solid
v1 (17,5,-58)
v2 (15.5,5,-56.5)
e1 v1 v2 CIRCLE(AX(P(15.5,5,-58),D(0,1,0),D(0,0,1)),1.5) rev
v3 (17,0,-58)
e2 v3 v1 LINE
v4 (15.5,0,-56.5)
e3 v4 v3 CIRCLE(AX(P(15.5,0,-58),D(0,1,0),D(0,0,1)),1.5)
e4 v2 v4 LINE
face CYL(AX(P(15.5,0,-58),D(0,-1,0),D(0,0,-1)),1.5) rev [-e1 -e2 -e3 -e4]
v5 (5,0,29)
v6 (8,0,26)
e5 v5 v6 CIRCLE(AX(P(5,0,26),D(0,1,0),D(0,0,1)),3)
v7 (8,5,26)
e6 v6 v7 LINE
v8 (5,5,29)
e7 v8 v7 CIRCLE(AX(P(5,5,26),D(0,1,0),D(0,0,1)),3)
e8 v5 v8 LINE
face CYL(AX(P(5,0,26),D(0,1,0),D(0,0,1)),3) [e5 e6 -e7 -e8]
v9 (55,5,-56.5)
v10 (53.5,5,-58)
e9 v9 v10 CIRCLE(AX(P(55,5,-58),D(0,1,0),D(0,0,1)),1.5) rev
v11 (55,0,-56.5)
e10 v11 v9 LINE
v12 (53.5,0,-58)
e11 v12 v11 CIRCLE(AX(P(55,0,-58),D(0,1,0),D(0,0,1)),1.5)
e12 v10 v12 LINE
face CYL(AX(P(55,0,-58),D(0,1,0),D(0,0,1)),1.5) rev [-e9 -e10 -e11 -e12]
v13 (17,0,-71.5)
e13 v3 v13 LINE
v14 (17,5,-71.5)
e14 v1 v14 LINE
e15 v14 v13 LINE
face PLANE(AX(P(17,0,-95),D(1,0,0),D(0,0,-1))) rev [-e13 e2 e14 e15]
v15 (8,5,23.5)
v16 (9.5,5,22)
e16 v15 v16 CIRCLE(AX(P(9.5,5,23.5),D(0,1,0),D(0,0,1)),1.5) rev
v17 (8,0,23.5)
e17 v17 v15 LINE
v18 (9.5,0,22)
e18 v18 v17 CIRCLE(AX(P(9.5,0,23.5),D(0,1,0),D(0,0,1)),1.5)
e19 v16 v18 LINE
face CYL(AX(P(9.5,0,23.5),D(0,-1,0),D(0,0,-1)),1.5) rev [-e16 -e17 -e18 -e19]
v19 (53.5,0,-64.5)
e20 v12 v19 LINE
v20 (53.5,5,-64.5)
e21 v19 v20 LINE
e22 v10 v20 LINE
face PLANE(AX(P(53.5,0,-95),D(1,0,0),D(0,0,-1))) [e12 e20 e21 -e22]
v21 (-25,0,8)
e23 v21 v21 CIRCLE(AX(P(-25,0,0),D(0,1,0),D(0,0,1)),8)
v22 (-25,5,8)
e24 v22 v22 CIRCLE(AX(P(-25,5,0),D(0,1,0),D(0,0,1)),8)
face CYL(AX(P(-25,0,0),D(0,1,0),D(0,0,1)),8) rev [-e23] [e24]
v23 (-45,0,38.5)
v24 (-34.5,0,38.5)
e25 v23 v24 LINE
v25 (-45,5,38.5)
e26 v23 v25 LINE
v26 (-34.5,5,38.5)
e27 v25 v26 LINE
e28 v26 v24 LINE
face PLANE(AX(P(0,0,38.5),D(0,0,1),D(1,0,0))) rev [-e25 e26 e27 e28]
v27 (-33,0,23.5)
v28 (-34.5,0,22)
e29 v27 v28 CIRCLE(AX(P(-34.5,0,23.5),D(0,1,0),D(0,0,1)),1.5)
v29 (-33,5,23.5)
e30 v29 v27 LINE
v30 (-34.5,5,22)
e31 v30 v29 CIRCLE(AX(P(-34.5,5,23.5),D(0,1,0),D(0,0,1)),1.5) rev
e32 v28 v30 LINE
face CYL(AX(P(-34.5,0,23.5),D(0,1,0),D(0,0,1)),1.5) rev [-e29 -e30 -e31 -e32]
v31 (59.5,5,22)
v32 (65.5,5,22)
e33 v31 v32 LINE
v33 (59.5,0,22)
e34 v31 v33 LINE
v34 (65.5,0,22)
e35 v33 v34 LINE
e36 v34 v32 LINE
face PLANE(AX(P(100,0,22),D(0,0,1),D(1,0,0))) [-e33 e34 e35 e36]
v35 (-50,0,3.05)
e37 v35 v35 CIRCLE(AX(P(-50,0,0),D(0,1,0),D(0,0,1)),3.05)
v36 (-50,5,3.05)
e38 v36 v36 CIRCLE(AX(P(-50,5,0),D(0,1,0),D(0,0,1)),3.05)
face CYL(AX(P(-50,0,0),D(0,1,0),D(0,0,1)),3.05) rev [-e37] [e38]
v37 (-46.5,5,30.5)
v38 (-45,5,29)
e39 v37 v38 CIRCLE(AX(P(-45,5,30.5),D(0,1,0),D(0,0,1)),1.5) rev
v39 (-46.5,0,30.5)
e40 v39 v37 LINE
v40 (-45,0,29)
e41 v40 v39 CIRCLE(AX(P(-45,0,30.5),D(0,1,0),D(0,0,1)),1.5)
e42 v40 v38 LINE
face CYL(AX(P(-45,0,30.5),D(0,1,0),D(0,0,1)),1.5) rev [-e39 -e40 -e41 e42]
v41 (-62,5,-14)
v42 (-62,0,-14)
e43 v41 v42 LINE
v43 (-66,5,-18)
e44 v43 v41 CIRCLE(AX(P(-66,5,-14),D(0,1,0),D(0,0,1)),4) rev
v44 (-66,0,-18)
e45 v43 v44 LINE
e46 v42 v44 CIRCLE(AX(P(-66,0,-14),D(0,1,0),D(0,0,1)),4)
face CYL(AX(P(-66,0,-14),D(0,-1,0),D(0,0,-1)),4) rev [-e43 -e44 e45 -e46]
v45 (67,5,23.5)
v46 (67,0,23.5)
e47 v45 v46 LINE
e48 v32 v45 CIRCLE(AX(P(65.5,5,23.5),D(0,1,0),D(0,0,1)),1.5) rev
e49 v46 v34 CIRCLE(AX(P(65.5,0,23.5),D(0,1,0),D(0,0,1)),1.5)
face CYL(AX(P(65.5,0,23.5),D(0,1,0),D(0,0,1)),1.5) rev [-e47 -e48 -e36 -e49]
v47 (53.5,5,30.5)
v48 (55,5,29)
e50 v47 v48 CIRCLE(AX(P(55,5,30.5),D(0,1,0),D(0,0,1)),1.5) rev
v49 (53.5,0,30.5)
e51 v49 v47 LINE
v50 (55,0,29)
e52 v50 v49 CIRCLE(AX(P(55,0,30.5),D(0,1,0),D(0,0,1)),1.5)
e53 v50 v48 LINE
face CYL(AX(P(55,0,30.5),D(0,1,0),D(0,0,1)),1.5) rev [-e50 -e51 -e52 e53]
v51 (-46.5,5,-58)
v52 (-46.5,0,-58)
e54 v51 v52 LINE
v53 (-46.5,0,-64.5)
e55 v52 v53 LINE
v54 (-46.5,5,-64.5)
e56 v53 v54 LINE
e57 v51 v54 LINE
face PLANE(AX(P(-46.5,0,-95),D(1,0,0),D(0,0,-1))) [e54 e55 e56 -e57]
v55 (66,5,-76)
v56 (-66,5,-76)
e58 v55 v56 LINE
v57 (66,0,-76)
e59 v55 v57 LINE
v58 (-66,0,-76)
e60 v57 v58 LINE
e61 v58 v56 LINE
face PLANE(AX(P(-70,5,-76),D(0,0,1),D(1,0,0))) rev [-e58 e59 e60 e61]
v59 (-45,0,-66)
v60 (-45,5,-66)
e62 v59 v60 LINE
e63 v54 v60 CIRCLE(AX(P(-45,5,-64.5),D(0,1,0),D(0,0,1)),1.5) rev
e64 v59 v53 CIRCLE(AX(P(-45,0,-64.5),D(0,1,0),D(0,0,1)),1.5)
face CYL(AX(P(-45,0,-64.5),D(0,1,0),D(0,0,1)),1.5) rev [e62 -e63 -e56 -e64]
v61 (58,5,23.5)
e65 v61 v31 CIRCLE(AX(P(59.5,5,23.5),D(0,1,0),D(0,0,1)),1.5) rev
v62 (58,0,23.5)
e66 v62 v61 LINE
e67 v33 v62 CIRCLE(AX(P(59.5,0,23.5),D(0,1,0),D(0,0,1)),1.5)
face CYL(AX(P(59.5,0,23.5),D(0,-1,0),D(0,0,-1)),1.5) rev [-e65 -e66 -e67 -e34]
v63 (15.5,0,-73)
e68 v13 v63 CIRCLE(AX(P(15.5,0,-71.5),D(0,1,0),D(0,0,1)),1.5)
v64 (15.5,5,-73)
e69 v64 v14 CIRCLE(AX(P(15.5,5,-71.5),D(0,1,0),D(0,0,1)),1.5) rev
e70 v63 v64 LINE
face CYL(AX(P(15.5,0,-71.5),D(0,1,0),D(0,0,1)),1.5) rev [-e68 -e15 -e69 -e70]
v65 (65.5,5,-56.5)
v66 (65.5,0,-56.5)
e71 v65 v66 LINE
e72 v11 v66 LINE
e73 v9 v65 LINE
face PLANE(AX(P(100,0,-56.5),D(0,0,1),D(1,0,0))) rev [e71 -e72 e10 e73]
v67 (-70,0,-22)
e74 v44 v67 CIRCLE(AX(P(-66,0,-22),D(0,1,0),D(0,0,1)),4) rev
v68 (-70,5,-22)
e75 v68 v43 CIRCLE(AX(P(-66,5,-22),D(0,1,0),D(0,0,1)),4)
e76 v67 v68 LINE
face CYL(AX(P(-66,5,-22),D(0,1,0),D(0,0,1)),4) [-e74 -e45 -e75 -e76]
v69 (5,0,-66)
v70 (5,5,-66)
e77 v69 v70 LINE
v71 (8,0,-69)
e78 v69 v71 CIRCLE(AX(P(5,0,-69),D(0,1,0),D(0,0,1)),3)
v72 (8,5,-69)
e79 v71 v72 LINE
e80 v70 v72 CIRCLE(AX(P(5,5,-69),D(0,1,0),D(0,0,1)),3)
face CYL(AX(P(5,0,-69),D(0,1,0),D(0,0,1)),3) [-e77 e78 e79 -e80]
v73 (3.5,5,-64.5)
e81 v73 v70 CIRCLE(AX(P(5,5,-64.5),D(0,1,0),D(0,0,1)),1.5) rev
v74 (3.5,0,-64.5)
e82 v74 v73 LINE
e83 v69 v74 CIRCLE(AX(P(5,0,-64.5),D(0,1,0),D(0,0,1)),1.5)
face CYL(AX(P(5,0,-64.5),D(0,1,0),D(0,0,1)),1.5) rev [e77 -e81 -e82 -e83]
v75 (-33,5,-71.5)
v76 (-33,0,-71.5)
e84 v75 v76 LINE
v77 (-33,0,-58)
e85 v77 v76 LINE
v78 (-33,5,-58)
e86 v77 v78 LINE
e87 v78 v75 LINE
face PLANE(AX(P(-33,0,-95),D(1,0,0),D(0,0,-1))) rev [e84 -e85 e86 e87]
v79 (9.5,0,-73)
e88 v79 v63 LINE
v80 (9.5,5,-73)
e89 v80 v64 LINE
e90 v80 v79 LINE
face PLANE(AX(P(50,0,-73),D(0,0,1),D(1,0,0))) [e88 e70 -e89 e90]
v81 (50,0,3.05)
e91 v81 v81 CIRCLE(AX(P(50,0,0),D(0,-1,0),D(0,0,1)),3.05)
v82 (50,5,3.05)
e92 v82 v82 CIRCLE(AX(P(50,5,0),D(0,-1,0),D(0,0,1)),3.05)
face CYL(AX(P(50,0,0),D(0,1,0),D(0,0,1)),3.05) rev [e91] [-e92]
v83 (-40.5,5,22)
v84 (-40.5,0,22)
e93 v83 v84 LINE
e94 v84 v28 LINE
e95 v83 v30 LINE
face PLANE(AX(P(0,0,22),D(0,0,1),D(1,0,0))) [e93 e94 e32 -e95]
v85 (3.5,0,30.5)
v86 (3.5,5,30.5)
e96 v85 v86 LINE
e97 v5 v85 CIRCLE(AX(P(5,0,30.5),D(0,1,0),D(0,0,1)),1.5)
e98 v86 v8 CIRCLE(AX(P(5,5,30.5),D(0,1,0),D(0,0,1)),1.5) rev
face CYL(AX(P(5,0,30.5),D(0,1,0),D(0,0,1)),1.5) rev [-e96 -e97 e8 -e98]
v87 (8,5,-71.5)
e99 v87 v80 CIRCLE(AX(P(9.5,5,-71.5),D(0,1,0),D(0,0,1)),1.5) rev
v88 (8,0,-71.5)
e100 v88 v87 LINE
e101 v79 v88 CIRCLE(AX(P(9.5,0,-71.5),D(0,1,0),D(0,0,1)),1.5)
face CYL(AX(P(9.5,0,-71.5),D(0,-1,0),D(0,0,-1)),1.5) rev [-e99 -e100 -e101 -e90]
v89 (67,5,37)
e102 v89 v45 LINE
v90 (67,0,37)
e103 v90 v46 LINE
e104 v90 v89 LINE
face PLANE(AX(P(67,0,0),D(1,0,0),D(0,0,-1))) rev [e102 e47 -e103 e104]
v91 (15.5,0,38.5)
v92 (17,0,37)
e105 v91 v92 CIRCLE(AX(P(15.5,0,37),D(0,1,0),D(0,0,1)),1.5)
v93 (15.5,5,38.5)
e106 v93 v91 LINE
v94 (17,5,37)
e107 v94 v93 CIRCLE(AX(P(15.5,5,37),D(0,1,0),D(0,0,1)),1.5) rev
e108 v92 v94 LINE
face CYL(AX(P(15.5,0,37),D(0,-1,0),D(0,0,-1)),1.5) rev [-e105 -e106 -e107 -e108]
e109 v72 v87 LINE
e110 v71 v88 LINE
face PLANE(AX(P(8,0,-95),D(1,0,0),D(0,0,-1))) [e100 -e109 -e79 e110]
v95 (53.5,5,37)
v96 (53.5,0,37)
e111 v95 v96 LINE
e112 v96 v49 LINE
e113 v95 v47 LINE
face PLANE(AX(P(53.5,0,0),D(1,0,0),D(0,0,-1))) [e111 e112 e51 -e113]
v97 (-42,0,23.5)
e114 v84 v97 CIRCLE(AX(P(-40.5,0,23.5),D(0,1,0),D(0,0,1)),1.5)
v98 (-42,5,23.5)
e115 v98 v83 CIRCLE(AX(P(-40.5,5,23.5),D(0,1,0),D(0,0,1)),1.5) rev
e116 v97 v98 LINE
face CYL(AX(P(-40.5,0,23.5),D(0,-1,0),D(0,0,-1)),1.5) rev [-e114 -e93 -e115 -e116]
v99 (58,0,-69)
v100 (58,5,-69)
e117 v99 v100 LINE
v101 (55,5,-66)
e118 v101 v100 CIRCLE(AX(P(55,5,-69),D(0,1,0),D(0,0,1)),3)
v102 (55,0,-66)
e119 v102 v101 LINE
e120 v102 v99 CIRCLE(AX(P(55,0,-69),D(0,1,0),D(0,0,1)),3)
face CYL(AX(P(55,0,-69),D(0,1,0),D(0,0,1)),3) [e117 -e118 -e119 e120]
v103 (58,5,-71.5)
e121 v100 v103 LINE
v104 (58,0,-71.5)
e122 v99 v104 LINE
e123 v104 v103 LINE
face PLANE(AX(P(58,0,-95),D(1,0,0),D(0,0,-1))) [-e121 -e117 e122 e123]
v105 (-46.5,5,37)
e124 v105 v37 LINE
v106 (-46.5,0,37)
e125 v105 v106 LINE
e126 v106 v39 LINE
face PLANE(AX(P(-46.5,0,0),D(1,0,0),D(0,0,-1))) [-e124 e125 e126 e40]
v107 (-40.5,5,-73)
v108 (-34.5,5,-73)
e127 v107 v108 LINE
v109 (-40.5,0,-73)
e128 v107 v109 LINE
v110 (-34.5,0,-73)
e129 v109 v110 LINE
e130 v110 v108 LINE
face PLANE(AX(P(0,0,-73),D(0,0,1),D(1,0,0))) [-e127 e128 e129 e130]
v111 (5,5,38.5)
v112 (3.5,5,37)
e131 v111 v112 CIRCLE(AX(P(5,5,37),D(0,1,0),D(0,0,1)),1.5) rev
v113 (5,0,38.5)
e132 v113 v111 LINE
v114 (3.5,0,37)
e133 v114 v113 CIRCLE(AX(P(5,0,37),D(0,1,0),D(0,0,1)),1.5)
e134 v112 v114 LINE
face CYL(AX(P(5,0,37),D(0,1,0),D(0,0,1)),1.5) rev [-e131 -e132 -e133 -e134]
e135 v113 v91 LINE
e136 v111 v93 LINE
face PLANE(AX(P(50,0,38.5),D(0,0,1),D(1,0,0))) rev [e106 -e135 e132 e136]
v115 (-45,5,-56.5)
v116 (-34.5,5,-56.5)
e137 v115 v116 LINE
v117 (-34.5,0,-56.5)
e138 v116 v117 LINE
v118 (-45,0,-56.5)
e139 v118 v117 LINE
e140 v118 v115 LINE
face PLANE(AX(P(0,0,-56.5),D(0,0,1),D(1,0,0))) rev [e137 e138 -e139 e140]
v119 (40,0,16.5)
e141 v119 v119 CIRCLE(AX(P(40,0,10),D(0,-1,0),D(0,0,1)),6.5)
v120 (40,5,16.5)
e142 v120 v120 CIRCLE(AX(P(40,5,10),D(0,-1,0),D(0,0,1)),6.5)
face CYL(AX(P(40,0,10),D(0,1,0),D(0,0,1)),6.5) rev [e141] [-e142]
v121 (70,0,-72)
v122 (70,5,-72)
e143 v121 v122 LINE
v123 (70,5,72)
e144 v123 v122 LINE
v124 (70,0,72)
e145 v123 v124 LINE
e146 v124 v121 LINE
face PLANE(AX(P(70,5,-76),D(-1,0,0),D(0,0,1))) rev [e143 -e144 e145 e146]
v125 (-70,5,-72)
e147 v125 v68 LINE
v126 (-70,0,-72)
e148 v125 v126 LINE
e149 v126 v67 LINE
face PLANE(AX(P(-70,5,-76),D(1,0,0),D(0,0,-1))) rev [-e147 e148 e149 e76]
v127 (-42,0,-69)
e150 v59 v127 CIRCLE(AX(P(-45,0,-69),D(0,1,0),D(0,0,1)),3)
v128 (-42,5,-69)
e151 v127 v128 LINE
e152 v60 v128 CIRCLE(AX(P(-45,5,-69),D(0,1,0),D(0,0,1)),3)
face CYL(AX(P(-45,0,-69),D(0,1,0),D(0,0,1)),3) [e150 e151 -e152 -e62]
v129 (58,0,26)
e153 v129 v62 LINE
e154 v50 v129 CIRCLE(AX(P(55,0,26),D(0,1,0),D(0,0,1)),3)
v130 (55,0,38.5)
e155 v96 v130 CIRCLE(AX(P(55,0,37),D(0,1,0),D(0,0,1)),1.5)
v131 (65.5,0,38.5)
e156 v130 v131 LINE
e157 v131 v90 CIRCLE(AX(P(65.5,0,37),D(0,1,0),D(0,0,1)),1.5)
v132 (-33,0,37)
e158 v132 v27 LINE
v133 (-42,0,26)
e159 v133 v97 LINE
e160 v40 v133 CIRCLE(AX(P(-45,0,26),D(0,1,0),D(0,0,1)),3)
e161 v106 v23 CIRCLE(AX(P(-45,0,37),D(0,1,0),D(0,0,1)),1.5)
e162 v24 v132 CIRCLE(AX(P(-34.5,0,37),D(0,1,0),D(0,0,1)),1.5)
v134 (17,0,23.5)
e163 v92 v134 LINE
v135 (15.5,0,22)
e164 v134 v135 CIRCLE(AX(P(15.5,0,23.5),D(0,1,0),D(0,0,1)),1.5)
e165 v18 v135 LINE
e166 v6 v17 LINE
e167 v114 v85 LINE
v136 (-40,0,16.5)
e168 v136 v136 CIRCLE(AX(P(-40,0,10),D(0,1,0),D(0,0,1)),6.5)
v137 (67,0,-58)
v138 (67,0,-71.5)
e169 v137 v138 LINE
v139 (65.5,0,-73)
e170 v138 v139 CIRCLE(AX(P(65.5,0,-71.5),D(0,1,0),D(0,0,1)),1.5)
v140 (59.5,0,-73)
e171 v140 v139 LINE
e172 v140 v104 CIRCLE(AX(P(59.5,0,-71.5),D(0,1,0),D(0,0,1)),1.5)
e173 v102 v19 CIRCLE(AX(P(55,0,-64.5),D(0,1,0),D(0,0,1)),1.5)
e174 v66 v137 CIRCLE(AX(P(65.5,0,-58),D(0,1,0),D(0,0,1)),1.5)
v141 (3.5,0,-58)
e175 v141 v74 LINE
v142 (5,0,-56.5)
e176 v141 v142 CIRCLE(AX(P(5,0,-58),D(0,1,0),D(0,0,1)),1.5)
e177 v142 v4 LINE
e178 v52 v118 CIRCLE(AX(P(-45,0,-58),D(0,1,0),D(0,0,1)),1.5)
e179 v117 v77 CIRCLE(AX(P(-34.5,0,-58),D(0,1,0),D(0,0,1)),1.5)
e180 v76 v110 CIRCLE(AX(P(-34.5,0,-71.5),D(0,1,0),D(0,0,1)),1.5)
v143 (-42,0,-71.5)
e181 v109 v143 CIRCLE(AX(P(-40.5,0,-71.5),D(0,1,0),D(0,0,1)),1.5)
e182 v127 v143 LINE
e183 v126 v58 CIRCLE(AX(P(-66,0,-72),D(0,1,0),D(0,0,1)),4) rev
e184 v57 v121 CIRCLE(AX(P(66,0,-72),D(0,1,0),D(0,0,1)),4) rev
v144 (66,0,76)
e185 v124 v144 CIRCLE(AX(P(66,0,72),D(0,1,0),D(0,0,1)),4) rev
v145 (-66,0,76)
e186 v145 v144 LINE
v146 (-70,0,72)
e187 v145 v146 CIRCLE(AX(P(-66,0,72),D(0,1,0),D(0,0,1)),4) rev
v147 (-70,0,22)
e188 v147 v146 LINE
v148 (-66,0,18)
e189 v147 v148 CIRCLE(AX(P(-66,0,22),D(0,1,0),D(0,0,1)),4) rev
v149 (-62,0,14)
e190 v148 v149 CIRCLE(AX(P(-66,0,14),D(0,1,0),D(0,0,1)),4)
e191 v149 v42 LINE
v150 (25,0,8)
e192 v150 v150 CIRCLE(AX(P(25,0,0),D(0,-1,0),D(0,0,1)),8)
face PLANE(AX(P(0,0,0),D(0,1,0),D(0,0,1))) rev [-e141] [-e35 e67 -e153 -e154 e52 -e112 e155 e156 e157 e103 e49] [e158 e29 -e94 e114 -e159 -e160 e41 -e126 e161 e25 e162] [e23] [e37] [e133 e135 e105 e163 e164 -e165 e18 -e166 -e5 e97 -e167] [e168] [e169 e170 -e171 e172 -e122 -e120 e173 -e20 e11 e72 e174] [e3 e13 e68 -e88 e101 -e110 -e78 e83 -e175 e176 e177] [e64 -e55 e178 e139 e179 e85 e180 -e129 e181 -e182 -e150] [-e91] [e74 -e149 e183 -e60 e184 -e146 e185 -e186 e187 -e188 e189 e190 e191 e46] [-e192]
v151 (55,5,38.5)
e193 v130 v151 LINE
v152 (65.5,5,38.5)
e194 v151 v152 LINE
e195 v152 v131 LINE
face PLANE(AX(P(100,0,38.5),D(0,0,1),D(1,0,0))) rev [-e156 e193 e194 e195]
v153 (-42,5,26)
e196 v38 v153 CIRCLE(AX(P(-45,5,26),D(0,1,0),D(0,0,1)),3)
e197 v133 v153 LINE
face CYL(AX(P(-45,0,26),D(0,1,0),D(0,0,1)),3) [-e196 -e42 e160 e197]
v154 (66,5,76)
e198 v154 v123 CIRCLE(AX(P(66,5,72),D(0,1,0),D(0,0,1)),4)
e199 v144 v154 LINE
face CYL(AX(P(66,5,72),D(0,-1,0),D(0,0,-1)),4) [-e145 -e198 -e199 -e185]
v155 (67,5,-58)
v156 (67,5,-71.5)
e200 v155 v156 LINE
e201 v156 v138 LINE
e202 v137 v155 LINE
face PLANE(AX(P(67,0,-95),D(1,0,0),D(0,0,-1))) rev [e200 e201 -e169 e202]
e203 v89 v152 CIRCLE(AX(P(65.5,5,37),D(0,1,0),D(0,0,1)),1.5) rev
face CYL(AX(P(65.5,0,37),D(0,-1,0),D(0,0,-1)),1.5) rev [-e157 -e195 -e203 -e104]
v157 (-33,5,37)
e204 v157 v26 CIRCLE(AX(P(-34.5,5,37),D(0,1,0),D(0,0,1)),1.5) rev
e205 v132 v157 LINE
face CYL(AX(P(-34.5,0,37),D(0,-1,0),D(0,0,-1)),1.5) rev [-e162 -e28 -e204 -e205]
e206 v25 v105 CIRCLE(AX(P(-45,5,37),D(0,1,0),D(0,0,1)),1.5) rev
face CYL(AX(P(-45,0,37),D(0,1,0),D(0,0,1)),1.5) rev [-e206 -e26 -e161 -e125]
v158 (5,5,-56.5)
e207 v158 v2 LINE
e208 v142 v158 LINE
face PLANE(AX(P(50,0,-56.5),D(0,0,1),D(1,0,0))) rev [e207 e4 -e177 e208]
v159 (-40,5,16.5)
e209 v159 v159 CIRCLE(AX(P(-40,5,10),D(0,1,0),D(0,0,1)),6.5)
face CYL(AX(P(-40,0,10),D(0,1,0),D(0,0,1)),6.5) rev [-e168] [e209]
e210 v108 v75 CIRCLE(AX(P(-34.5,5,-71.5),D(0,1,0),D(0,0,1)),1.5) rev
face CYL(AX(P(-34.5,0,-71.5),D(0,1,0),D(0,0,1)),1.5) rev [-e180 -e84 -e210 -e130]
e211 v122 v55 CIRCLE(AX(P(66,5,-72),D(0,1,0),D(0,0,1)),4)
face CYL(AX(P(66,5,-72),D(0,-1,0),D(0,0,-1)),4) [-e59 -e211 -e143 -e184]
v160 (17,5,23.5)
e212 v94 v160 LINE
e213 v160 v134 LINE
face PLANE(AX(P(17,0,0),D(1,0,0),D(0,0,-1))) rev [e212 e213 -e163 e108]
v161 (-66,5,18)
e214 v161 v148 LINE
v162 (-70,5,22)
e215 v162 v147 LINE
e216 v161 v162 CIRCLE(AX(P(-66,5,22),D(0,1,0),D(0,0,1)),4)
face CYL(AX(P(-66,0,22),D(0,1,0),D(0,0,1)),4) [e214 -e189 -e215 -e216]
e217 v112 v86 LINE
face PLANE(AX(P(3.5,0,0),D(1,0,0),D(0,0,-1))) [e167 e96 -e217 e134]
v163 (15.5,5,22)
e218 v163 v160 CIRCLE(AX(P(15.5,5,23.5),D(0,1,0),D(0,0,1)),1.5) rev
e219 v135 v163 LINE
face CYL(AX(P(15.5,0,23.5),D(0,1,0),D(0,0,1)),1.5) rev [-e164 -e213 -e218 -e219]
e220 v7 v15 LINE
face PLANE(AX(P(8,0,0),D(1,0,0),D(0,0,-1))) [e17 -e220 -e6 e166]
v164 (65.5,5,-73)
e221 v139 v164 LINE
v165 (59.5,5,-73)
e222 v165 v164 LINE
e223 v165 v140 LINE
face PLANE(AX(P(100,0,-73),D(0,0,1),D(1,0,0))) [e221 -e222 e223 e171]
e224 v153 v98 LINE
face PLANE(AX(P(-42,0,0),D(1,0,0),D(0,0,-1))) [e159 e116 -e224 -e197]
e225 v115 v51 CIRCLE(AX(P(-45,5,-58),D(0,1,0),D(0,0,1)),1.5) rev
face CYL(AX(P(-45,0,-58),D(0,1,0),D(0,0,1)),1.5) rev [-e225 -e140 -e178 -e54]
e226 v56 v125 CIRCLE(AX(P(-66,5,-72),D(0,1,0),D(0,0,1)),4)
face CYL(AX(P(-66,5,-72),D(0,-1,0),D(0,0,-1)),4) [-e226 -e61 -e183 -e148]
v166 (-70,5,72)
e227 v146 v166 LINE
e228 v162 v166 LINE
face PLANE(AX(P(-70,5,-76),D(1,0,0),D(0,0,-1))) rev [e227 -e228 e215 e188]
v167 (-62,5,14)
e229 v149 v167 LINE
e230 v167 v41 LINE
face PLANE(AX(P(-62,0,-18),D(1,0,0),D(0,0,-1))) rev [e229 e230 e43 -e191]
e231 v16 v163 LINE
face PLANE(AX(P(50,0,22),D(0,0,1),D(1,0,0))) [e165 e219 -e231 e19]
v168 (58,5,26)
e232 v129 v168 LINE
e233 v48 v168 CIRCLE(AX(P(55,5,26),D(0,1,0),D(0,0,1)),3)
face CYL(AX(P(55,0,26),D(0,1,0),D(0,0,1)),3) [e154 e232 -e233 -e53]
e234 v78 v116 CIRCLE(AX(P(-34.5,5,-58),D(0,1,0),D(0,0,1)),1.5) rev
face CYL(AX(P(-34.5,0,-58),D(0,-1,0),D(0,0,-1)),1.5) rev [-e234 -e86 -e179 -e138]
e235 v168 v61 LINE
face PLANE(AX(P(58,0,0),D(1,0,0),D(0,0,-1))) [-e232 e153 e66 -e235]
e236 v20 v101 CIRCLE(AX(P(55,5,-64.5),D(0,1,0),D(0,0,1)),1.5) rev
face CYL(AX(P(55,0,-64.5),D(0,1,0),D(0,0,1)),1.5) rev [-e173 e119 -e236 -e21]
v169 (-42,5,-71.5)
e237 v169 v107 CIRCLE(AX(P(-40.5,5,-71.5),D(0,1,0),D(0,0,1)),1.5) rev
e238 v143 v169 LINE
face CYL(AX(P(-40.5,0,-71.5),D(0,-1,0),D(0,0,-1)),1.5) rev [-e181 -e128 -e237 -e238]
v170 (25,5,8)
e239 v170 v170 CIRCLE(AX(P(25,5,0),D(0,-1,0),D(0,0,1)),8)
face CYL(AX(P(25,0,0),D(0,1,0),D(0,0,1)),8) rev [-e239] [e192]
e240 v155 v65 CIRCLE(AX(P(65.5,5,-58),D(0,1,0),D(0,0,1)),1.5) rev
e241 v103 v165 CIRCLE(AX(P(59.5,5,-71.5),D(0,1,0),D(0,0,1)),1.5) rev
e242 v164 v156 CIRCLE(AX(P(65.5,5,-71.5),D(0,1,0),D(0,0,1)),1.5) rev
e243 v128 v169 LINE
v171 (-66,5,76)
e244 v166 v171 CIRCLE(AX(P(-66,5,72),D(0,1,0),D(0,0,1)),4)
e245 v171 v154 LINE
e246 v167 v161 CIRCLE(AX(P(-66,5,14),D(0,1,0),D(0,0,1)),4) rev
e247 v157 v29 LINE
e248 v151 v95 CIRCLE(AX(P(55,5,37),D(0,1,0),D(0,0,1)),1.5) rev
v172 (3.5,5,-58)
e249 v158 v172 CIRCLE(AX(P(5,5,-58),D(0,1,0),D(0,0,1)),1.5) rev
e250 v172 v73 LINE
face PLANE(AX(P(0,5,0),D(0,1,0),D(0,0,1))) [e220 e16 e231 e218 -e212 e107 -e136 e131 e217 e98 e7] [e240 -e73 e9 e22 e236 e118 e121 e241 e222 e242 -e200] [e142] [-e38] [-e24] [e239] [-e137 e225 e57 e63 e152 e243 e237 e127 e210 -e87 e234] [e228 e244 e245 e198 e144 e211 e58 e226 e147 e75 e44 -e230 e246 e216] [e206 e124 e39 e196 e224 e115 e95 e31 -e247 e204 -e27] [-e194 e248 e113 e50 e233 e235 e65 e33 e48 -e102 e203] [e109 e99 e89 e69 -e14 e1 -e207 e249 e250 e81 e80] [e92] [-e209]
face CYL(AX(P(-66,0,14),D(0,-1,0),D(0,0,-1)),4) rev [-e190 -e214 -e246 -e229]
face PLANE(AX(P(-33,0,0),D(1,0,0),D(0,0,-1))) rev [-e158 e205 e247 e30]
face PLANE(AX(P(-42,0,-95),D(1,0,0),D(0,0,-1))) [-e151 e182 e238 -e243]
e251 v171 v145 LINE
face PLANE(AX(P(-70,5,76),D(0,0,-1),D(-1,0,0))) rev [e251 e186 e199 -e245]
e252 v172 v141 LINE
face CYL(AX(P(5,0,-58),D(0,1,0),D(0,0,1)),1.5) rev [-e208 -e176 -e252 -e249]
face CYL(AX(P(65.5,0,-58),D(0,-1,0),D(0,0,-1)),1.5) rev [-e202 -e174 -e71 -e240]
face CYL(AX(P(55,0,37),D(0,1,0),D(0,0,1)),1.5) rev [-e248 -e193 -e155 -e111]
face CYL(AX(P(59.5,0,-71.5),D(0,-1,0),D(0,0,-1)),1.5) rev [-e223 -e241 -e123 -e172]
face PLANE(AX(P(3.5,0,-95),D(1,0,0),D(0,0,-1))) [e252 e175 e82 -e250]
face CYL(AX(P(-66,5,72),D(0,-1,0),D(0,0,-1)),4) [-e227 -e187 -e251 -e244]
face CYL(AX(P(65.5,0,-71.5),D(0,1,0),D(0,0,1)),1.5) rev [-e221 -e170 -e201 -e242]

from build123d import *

# Parameters (mm, degrees)
SKETCH1_W              = 140
SKETCH1_H              = 152
BOSS_EXTRUDE1_DEPTH    = 5
SKETCH2_R              = 3.05
SKETCH2_R_2            = 8
SKETCH2_R_3            = 6.5
CUT_EXTRUDE1_DEPTH     = 104.445637897
SKETCH4_W              = 8
SKETCH4_H              = 36
CUT_EXTRUDE3_DEPTH     = 104.445637897
CUT_EXTRUDE2_DEPTH     = 104.445637897
FILLET3_R              = 1.5
LPATTERN1_COUNT        = 3
LPATTERN1_PITCH        = 50
FILLET3_OF_LPATTERN1_R = 1.5
LPATTERN4_DEPTH        = 5
FILLET1_R              = 4


# Read off the part's stored shape, not the designer's step: LPattern4
with BuildPart() as part:
    # Sketch1 → Boss-Extrude1 (new body)
    with BuildSketch(Plane(origin=(0, 0, 0), x_dir=(1, 0, 0), z_dir=(0, 1, 0))):
        Rectangle(SKETCH1_W, SKETCH1_H)
    extrude(amount=BOSS_EXTRUDE1_DEPTH)

    # Sketch2 → Cut-Extrude1 (cut, through all)
    with BuildSketch(Plane(origin=(0, 5, 0), x_dir=(1, 0, 0), z_dir=(0, 1, 0))):
        with Locations(Location((-50, 0, 0), (0, 0, 270))):
            Circle(SKETCH2_R)
        with Locations(Location((-25, 0, 0), (0, 0, 270))):
            Circle(SKETCH2_R_2)
        with Locations(Location((-40, -10, 0), (0, 0, 270))):
            Circle(SKETCH2_R_3)
    cut_extrude1 = extrude(amount=-CUT_EXTRUDE1_DEPTH, mode=Mode.SUBTRACT)

    # Mirror1: Cut-Extrude1 across plane
    add(cut_extrude1.mirror(Plane(origin=(0, 0, 0), x_dir=(0, 0, 1), z_dir=(1, 0, 0))), mode=Mode.SUBTRACT)

    # Sketch4 → Cut-Extrude3 (cut, through all)
    with BuildSketch(Plane(origin=(0, 5, 0), x_dir=(1, 0, 0), z_dir=(0, 1, 0))):
        with Locations((-66, 0)):
            Rectangle(SKETCH4_W, SKETCH4_H)
    extrude(amount=-CUT_EXTRUDE3_DEPTH, mode=Mode.SUBTRACT)

    # Sketch3 → Cut-Extrude2 (cut, through all)
    with BuildSketch(Plane(origin=(0, 5, 0), x_dir=(1, 0, 0), z_dir=(0, 1, 0))):
        with BuildLine():
            ThreePointArc((-42, -26), (-42.878679656, -28.121320344), (-45, -29))
            Line((-45, -29), (-46.5, -29))
            Line((-46.5, -29), (-46.5, -38.5))
            Line((-46.5, -38.5), (-33, -38.5))
            Line((-33, -38.5), (-33, -22))
            Line((-33, -22), (-42, -22))
            Line((-42, -22), (-42, -26))
        make_face()
    cut_extrude2 = extrude(amount=-CUT_EXTRUDE2_DEPTH, mode=Mode.SUBTRACT)

    # Fillet3
    fillet3_edges = [part.edges().sort_by_distance(p)[0] for p in [
        (-33, 2.5, 38.5),
        (-46.5, 2.5, 38.5),
        (-46.5, 2.5, 29),
        (-33, 2.5, 22),
        (-42, 2.5, 22),
    ]]
    fillet(fillet3_edges, radius=FILLET3_R - 0.0001)  # a hair under: the kernel refuses the full size

    # LPattern1: Cut-Extrude2 ×3
    with Locations(*[(i * LPATTERN1_PITCH, 0, 0) for i in range(1, LPATTERN1_COUNT)]):
        add(cut_extrude2, mode=Mode.SUBTRACT)

    # Fillet3 of LPattern1
    fillet3_of_lpattern1_edges = [part.edges().sort_by_distance(p)[0] for p in [
        (17, 2.5, 38.5),
        (3.5, 2.5, 38.5),
        (3.5, 2.5, 29),
        (17, 2.5, 22),
        (8, 2.5, 22),
        (67, 2.5, 38.5),
        (53.5, 2.5, 38.5),
        (53.5, 2.5, 29),
        (67, 2.5, 22),
        (58, 2.5, 22),
    ]]
    fillet(fillet3_of_lpattern1_edges, radius=FILLET3_OF_LPATTERN1_R - 0.0001)  # a hair under: the kernel refuses the full size

    # LPattern4 outline → LPattern4 (cut)
    with BuildSketch(Plane(origin=(0, 0, 0), x_dir=(1, 0, 0), z_dir=(0, 1, 0))):
        with BuildLine():
            ThreePointArc((65.5, 56.5), (66.560660172, 56.939339828), (67, 58))
            Line((67, 58), (67, 71.5))
            ThreePointArc((67, 71.5), (66.560660172, 72.560660172), (65.5, 73))
            Line((65.5, 73), (59.5, 73))
            ThreePointArc((59.5, 73), (58.439339828, 72.560660172), (58, 71.5))
            Line((58, 71.5), (58, 69))
            ThreePointArc((58, 69), (57.121320344, 66.878679656), (55, 66))
            ThreePointArc((55, 66), (53.939339828, 65.560660172), (53.5, 64.5))
            Line((53.5, 64.5), (53.5, 58))
            ThreePointArc((53.5, 58), (53.939339828, 56.939339828), (55, 56.5))
            Line((55, 56.5), (65.5, 56.5))
        make_face()
        with BuildLine():
            Line((-42, 71.5), (-42, 69))
            ThreePointArc((-42, 69), (-42.878679656, 66.878679656), (-45, 66))
            ThreePointArc((-45, 66), (-46.060660172, 65.560660172), (-46.5, 64.5))
            Line((-46.5, 64.5), (-46.5, 58))
            ThreePointArc((-46.5, 58), (-46.060660172, 56.939339828), (-45, 56.5))
            Line((-45, 56.5), (-34.5, 56.5))
            ThreePointArc((-34.5, 56.5), (-33.439339828, 56.939339828), (-33, 58))
            Line((-33, 58), (-33, 71.5))
            ThreePointArc((-33, 71.5), (-33.439339828, 72.560660172), (-34.5, 73))
            Line((-34.5, 73), (-40.5, 73))
            ThreePointArc((-40.5, 73), (-41.560660172, 72.560660172), (-42, 71.5))
        make_face()
        with BuildLine():
            Line((8, 71.5), (8, 69))
            ThreePointArc((8, 69), (7.121320344, 66.878679656), (5, 66))
            ThreePointArc((5, 66), (3.939339828, 65.560660172), (3.5, 64.5))
            Line((3.5, 64.5), (3.5, 58))
            ThreePointArc((3.5, 58), (3.939339828, 56.939339828), (5, 56.5))
            Line((5, 56.5), (15.5, 56.5))
            ThreePointArc((15.5, 56.5), (16.560660172, 56.939339828), (17, 58))
            Line((17, 58), (17, 71.5))
            ThreePointArc((17, 71.5), (16.560660172, 72.560660172), (15.5, 73))
            Line((15.5, 73), (9.5, 73))
            ThreePointArc((9.5, 73), (8.439339828, 72.560660172), (8, 71.5))
        make_face()
    extrude(amount=LPATTERN4_DEPTH, mode=Mode.SUBTRACT)

    # Fillet1
    fillet1_edges = [part.edges().sort_by_distance(p)[0] for p in [
        (-70, 2.5, -76),
        (70, 2.5, -76),
        (70, 2.5, 76),
        (-70, 2.5, 76),
        (-70, 2.5, 18),
        (-62, 2.5, 18),
        (-62, 2.5, -18),
        (-70, 2.5, -18),
    ]]
    fillet(fillet1_edges, radius=FILLET1_R - 0.0001)  # a hair under: the kernel refuses the full size


solid = part.part
